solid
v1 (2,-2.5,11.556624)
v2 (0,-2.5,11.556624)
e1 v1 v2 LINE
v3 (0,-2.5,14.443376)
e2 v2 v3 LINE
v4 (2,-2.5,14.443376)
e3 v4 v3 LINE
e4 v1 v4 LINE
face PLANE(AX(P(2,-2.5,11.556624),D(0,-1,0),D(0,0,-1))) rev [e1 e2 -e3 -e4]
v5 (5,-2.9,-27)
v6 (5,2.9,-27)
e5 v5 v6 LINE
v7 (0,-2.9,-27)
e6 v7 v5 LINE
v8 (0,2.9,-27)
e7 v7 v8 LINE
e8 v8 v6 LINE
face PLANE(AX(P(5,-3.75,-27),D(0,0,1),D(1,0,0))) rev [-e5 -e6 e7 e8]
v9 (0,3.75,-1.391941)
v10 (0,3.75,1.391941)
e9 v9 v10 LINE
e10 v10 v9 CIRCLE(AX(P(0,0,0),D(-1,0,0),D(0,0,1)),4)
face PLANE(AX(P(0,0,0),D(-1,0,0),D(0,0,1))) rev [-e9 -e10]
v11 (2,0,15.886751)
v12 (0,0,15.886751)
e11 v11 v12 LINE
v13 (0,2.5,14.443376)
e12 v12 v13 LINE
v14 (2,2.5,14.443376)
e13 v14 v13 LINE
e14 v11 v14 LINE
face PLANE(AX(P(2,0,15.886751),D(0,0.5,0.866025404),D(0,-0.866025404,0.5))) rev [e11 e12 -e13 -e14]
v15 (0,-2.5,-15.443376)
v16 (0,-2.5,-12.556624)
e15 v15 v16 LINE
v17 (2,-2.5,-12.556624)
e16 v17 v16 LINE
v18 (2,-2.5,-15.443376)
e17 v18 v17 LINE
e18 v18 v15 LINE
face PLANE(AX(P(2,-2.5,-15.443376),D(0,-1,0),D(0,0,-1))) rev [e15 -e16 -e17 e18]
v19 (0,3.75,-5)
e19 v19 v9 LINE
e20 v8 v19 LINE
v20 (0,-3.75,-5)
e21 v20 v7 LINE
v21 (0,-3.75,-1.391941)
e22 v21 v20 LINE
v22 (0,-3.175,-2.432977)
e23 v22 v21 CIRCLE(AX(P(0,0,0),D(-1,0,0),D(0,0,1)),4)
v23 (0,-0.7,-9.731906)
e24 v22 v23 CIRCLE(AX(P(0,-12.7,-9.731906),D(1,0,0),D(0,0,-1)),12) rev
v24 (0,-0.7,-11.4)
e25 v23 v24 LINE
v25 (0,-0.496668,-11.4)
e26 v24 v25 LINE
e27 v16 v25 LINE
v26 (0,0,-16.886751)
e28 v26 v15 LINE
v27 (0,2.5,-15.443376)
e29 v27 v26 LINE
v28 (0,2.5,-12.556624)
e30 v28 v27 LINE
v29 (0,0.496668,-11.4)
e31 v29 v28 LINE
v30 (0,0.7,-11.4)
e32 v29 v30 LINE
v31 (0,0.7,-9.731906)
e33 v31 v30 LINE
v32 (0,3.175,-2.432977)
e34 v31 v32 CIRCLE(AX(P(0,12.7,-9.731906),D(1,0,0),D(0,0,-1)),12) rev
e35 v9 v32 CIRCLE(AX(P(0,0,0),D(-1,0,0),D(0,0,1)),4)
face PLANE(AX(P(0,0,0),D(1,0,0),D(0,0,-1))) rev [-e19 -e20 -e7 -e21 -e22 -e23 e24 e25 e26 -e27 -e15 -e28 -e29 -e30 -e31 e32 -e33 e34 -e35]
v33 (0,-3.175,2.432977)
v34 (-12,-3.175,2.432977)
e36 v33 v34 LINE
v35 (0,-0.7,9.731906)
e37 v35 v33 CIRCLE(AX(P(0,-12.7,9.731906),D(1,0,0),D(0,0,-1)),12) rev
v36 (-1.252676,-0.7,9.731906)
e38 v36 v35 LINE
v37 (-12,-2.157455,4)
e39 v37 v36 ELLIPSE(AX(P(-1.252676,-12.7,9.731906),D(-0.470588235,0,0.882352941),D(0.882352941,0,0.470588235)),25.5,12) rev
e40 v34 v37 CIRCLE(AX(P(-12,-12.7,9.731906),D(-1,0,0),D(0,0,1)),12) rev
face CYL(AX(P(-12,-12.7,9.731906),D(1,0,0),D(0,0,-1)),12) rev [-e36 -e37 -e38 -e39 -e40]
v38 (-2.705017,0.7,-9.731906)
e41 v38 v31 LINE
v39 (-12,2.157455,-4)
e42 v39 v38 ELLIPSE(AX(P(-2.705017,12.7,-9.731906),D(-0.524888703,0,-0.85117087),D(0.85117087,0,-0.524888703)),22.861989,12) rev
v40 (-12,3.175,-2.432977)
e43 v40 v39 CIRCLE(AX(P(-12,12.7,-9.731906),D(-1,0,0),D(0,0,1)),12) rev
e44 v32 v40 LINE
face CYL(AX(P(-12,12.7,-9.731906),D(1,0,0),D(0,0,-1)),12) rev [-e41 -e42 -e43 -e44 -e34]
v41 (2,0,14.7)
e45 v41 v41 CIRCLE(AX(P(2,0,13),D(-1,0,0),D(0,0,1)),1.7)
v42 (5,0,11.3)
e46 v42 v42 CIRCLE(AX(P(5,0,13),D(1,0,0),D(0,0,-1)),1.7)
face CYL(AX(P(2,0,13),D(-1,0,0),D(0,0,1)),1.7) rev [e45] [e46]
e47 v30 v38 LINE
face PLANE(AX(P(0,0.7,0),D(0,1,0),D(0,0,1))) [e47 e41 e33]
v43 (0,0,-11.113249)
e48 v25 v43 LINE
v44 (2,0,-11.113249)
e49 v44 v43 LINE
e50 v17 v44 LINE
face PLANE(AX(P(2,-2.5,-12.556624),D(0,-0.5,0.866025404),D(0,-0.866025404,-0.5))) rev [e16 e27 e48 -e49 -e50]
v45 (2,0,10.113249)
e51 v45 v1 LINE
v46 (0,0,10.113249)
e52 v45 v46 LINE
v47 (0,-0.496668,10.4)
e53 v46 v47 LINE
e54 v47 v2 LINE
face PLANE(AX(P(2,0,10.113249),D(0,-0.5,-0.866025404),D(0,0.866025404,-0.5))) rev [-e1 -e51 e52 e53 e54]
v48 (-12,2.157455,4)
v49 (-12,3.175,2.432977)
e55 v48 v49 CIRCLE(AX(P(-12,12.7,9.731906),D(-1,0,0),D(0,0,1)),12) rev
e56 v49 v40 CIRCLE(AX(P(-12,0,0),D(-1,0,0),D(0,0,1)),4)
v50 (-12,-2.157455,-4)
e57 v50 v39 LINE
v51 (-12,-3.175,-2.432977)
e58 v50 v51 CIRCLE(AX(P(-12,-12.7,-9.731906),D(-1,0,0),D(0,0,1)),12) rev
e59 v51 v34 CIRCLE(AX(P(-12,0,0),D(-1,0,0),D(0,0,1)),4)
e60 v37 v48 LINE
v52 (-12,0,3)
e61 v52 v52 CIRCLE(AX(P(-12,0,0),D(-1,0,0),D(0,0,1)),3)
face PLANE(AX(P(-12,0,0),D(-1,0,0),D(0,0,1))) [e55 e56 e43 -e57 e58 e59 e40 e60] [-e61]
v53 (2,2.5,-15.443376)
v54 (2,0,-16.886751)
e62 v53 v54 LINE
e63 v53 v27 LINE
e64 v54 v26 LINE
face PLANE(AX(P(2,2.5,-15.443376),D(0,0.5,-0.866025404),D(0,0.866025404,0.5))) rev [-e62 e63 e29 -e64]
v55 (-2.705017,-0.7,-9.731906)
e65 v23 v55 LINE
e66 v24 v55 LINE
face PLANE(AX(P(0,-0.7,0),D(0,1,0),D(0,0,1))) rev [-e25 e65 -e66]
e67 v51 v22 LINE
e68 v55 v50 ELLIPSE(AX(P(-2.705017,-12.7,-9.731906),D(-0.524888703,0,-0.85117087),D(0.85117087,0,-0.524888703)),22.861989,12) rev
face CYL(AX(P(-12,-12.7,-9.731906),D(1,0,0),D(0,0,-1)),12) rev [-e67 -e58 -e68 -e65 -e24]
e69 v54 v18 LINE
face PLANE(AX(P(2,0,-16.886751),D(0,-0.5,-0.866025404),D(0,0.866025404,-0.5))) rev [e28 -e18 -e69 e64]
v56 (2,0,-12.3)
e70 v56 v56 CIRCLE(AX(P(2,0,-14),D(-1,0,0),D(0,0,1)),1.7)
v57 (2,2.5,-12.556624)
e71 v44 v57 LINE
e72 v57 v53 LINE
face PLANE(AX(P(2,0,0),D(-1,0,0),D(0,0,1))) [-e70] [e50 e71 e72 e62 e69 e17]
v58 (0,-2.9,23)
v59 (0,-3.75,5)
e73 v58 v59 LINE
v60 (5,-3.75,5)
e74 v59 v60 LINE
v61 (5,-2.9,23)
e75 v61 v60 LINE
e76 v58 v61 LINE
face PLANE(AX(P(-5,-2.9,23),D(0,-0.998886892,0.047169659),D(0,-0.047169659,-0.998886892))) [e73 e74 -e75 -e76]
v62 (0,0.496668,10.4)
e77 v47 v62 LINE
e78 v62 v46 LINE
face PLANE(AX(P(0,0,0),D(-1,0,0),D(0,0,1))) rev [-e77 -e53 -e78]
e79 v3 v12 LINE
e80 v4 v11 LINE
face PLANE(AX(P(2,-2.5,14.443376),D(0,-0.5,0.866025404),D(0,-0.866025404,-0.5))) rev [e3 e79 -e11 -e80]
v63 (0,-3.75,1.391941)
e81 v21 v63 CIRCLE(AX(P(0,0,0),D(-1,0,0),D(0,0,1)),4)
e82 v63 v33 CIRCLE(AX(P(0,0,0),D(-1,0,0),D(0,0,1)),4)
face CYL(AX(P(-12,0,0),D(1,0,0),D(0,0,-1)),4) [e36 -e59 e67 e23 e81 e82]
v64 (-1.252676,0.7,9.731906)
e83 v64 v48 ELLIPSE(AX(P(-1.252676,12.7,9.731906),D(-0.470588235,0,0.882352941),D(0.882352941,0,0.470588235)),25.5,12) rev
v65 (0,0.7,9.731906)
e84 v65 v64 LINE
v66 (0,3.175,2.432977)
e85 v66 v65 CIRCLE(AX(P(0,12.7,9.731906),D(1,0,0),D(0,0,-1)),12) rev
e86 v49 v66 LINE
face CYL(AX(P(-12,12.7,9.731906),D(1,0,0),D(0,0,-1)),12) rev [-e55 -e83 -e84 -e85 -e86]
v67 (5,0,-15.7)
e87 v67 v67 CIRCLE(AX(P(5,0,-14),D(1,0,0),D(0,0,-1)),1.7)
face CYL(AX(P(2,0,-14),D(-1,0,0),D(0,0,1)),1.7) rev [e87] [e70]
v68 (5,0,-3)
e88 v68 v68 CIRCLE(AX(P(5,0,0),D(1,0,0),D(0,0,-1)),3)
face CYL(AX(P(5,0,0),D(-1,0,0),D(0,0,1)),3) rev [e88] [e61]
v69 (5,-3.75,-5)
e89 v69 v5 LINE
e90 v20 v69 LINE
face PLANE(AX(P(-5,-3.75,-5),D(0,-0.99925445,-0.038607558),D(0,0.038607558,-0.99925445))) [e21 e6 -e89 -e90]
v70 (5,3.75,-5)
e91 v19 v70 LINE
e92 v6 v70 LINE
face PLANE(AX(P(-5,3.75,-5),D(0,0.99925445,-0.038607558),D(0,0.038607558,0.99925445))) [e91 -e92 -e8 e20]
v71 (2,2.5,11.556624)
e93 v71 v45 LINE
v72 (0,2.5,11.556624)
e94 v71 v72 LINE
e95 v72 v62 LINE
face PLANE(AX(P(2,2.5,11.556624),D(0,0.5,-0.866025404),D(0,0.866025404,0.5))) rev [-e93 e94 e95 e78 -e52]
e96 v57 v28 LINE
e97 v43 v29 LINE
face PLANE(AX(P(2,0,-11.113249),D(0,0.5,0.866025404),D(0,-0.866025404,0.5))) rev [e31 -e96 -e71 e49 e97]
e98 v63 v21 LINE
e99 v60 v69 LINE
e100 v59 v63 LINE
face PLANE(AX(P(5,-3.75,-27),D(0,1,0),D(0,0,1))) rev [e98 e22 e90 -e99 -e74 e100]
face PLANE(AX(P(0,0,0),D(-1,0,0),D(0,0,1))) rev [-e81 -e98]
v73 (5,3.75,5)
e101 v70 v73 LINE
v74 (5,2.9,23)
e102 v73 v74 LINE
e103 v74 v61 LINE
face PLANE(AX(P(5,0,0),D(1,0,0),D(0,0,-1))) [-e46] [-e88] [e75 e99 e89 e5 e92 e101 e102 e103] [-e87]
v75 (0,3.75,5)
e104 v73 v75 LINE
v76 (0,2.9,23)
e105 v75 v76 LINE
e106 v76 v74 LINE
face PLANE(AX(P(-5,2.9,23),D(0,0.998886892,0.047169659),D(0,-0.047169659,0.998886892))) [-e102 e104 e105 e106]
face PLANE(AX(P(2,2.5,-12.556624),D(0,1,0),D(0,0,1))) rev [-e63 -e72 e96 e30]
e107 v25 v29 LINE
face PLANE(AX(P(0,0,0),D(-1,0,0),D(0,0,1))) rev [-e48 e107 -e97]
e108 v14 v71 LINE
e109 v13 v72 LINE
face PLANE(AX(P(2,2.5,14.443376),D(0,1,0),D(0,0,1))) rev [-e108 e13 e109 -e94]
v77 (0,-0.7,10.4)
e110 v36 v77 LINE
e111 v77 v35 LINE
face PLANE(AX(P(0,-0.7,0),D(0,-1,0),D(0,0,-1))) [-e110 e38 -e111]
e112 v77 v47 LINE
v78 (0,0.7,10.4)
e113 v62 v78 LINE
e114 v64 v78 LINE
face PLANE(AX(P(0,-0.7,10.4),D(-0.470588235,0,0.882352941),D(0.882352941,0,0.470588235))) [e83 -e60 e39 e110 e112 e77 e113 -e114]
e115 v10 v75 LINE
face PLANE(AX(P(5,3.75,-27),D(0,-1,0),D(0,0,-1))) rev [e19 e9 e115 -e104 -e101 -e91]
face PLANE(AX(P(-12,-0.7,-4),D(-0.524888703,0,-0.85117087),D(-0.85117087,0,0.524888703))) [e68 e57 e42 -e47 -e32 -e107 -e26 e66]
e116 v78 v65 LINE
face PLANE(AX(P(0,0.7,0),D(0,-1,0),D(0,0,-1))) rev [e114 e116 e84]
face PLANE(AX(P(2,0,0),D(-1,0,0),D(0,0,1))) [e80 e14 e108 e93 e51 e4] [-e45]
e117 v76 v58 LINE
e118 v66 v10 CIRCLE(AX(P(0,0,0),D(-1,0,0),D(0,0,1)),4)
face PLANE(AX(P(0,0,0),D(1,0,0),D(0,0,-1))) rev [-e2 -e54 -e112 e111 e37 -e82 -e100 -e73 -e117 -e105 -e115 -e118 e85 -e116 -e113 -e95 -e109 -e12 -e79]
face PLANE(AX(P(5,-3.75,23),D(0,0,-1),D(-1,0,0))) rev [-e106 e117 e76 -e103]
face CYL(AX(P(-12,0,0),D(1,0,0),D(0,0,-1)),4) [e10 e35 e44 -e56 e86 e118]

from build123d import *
from build123d.topology import SkipClean

# Parameters (mm, degrees)
SKETCH1_W                = 50
SKETCH1_H                = 7.5
SKETCH1_R                = 3
BOSS_EXTRUDE1_DEPTH      = 5
BOSS_EXTRUDE2_START      = 12
SKETCH2_R                = 4
SKETCH2_R_2              = 3
BOSS_EXTRUDE2_DEPTH      = 12
BOSS_EXTRUDE3_DEPTH      = 0.7
BOSS_EXTRUDE3_DEPTH_BACK = 0.7
CUT_EXTRUDE1_DEPTH       = 2
M3_CLEARANCE_HOLE1_D     = 3.4
M3_CLEARANCE_HOLE1_DEPTH = 12
M3_CLEARANCE_HOLE1_TIP   = 1.021463052
FILLET1_R                = 12
SKETCH10_W               = 58.526718394
SKETCH10_H               = 17.276675166
CUT_EXTRUDE2_DEPTH       = 10


with BuildPart() as part:
    # Sketch1 → Boss-Extrude1 (new body)
    with BuildSketch(Plane(origin=(0, 0, 0), x_dir=(0, 0, -1), z_dir=(1, 0, 0))):
        with Locations((2, 0)):
            Rectangle(SKETCH1_W, SKETCH1_H)
        Circle(SKETCH1_R, mode=Mode.SUBTRACT)
    extrude(amount=BOSS_EXTRUDE1_DEPTH)

    # Sketch2 → Boss-Extrude2 (add)
    with SkipClean():  # the faces are left unmerged after this step: merging them gives an invalid solid
        with BuildSketch(Plane.ZY.offset(BOSS_EXTRUDE2_START)):
            with Locations(Location((0, 0, 0), (0, 0, 249.635865194))):
                Circle(SKETCH2_R)
            Circle(SKETCH2_R_2, mode=Mode.SUBTRACT)
        extrude(amount=-BOSS_EXTRUDE2_DEPTH)

    # Sketch3 → Boss-Extrude3 (add, two sides: drawn at the far end of the back side and taken through both)
    with SkipClean():  # the faces are left unmerged after this step: merging them gives an invalid solid
        with BuildSketch(Plane(origin=(0, 0, 0), x_dir=(1, 0, 0), z_dir=(0, 1, 0)).offset(-BOSS_EXTRUDE3_DEPTH_BACK)):
            Polygon((-12, 4), (0, 11.4), (0, 3.4), (-12, 3.4), align=None)
            Polygon((-12, -3.4), (0, -3.4), (0, -10.4), (-12, -4), align=None)
        extrude(amount=BOSS_EXTRUDE3_DEPTH + BOSS_EXTRUDE3_DEPTH_BACK)

    # Sketch4 → Cut-Extrude1 (cut)
    with SkipClean():  # the faces are left unmerged after this step: merging them gives an invalid solid
        with BuildSketch(Plane.ZY):
            Polygon((-12.556624327, 2.5), (-15.443375673, 2.5), (-16.886751346, 0), (-15.443375673, -2.5), (-12.556624327, -2.5), (-11.113248654, 0), align=None)
            Polygon((14.443375673, 2.5), (11.556624327, 2.5), (10.113248654, 0), (11.556624327, -2.5), (14.443375673, -2.5), (15.886751346, 0), align=None)
        extrude(amount=-CUT_EXTRUDE1_DEPTH, mode=Mode.SUBTRACT)

    # M3 Clearance Hole1
    with Locations(Plane.ZY.offset(-2)):
        with Locations((-14, 0), (13, 0)):
            Hole(M3_CLEARANCE_HOLE1_D / 2, depth=M3_CLEARANCE_HOLE1_DEPTH)
            with Locations((0, 0, -(M3_CLEARANCE_HOLE1_DEPTH + M3_CLEARANCE_HOLE1_TIP / 2))):  # 118° drill point
                Cone(0, M3_CLEARANCE_HOLE1_D / 2, M3_CLEARANCE_HOLE1_TIP, mode=Mode.SUBTRACT)

    # Fillet1
    # the kernel refuses this fillet: 12 mm, written as the material it adds along each edge
    with BuildSketch(Plane(origin=(0, -0.7, 3.938273734), x_dir=(0, -0.8543862513490332, -0.5196384642284927), z_dir=(-1, 0, 0))) as fillet1_piece_1_section:
        with BuildLine():
            CenterArc((7.242040693, 11.185661571), FILLET1_R, 211.308003518, 37.462651073)
            Line((-3.010594323, 4.95), (0, 0))
            ThreePointArc((0, 0), (1.448408139, 0.271446143), (2.896816277, 0))
        make_face()
    fillet1_piece_1 = extrude(amount=12, mode=Mode.PRIVATE)
    fillet1_piece_1 = split(fillet1_piece_1, bisect_by=Plane(origin=(-6.307781997, -1.304831425, 7.035849602), z_dir=(0.4705882352941177, 0, -0.8823529411764706)), keep=Keep.TOP, mode=Mode.PRIVATE)
    add(fillet1_piece_1)
    with BuildSketch(Plane(origin=(0, -0.7, -3.938273734), x_dir=(0, 0, -1), z_dir=(-1, 0, 0))) as fillet1_piece_2_section:
        with BuildLine():
            CenterArc((5.793632555, 12), FILLET1_R, 232.537348927, 37.462651073)
            ThreePointArc((-1.505297161, 2.475), (-0.520728728, 1.378553857), (0, 0))
            Line((0, 0), (5.793632555, 0))
        make_face()
    fillet1_piece_2 = extrude(amount=12, mode=Mode.PRIVATE)
    fillet1_piece_2 = split(fillet1_piece_2, bisect_by=Plane(origin=(-6.659764373, -1.285299154, -7.293145303), z_dir=(0.5248887029964605, 0, 0.85117086972399)), keep=Keep.TOP, mode=Mode.PRIVATE)
    add(fillet1_piece_2)
    with BuildSketch(Plane(origin=(0, 0.7, -3.938273734), x_dir=(0, 0.8543862513490333, 0.5196384642284927), z_dir=(-1, 0, 0))) as fillet1_piece_3_section:
        with BuildLine():
            CenterArc((7.242040693, 11.185661571), FILLET1_R, 211.308003518, 37.462651073)
            Line((-3.010594323, 4.95), (0, 0))
            ThreePointArc((0, 0), (1.448408139, 0.271446143), (2.896816277, 0))
        make_face()
    fillet1_piece_3 = extrude(amount=12, mode=Mode.PRIVATE)
    fillet1_piece_3 = split(fillet1_piece_3, bisect_by=Plane(origin=(-6.659764373, 1.285299154, -7.293145303), z_dir=(0.5248887029964605, 0, 0.85117086972399)), keep=Keep.TOP, mode=Mode.PRIVATE)
    add(fillet1_piece_3)
    with BuildSketch(Plane(origin=(0, 0.7, 3.938273734), x_dir=(0, 0.8543862513490332, -0.5196384642284927), z_dir=(-1, 0, 0))) as fillet1_piece_4_section:
        with BuildLine():
            CenterArc((7.242040693, -11.185661571), FILLET1_R, 111.22934541, 37.462651073)
            Line((-3.010594323, -4.95), (0, 0))
            ThreePointArc((0, 0), (1.448408139, -0.271446143), (2.896816277, 0))
        make_face()
    fillet1_piece_4 = extrude(amount=12, mode=Mode.PRIVATE)
    fillet1_piece_4 = split(fillet1_piece_4, bisect_by=Plane(origin=(-6.307781997, 1.304831425, 7.035849602), z_dir=(0.4705882352941177, 0, -0.8823529411764706)), keep=Keep.TOP, mode=Mode.PRIVATE)
    add(fillet1_piece_4)

    # Sketch10 → Cut-Extrude2 (cut)
    with BuildSketch(Plane(origin=(5, 0, 0), x_dir=(0, 0, -1), z_dir=(1, 0, 0))):
        with Locations((1.162690709, -0.31968068)):
            Rectangle(SKETCH10_W, SKETCH10_H)
        Polygon((-23, 2.9), (-5, 3.75), (-0.481104297, 5.04930998), (5, 3.75), (27, 2.9), (27, -2.9), (5, -3.75), (-0.481104297, -5.04930998), (-5, -3.75), (-23, -2.9), align=None, mode=Mode.SUBTRACT)
    extrude(amount=-CUT_EXTRUDE2_DEPTH, mode=Mode.SUBTRACT)


solid = part.part
